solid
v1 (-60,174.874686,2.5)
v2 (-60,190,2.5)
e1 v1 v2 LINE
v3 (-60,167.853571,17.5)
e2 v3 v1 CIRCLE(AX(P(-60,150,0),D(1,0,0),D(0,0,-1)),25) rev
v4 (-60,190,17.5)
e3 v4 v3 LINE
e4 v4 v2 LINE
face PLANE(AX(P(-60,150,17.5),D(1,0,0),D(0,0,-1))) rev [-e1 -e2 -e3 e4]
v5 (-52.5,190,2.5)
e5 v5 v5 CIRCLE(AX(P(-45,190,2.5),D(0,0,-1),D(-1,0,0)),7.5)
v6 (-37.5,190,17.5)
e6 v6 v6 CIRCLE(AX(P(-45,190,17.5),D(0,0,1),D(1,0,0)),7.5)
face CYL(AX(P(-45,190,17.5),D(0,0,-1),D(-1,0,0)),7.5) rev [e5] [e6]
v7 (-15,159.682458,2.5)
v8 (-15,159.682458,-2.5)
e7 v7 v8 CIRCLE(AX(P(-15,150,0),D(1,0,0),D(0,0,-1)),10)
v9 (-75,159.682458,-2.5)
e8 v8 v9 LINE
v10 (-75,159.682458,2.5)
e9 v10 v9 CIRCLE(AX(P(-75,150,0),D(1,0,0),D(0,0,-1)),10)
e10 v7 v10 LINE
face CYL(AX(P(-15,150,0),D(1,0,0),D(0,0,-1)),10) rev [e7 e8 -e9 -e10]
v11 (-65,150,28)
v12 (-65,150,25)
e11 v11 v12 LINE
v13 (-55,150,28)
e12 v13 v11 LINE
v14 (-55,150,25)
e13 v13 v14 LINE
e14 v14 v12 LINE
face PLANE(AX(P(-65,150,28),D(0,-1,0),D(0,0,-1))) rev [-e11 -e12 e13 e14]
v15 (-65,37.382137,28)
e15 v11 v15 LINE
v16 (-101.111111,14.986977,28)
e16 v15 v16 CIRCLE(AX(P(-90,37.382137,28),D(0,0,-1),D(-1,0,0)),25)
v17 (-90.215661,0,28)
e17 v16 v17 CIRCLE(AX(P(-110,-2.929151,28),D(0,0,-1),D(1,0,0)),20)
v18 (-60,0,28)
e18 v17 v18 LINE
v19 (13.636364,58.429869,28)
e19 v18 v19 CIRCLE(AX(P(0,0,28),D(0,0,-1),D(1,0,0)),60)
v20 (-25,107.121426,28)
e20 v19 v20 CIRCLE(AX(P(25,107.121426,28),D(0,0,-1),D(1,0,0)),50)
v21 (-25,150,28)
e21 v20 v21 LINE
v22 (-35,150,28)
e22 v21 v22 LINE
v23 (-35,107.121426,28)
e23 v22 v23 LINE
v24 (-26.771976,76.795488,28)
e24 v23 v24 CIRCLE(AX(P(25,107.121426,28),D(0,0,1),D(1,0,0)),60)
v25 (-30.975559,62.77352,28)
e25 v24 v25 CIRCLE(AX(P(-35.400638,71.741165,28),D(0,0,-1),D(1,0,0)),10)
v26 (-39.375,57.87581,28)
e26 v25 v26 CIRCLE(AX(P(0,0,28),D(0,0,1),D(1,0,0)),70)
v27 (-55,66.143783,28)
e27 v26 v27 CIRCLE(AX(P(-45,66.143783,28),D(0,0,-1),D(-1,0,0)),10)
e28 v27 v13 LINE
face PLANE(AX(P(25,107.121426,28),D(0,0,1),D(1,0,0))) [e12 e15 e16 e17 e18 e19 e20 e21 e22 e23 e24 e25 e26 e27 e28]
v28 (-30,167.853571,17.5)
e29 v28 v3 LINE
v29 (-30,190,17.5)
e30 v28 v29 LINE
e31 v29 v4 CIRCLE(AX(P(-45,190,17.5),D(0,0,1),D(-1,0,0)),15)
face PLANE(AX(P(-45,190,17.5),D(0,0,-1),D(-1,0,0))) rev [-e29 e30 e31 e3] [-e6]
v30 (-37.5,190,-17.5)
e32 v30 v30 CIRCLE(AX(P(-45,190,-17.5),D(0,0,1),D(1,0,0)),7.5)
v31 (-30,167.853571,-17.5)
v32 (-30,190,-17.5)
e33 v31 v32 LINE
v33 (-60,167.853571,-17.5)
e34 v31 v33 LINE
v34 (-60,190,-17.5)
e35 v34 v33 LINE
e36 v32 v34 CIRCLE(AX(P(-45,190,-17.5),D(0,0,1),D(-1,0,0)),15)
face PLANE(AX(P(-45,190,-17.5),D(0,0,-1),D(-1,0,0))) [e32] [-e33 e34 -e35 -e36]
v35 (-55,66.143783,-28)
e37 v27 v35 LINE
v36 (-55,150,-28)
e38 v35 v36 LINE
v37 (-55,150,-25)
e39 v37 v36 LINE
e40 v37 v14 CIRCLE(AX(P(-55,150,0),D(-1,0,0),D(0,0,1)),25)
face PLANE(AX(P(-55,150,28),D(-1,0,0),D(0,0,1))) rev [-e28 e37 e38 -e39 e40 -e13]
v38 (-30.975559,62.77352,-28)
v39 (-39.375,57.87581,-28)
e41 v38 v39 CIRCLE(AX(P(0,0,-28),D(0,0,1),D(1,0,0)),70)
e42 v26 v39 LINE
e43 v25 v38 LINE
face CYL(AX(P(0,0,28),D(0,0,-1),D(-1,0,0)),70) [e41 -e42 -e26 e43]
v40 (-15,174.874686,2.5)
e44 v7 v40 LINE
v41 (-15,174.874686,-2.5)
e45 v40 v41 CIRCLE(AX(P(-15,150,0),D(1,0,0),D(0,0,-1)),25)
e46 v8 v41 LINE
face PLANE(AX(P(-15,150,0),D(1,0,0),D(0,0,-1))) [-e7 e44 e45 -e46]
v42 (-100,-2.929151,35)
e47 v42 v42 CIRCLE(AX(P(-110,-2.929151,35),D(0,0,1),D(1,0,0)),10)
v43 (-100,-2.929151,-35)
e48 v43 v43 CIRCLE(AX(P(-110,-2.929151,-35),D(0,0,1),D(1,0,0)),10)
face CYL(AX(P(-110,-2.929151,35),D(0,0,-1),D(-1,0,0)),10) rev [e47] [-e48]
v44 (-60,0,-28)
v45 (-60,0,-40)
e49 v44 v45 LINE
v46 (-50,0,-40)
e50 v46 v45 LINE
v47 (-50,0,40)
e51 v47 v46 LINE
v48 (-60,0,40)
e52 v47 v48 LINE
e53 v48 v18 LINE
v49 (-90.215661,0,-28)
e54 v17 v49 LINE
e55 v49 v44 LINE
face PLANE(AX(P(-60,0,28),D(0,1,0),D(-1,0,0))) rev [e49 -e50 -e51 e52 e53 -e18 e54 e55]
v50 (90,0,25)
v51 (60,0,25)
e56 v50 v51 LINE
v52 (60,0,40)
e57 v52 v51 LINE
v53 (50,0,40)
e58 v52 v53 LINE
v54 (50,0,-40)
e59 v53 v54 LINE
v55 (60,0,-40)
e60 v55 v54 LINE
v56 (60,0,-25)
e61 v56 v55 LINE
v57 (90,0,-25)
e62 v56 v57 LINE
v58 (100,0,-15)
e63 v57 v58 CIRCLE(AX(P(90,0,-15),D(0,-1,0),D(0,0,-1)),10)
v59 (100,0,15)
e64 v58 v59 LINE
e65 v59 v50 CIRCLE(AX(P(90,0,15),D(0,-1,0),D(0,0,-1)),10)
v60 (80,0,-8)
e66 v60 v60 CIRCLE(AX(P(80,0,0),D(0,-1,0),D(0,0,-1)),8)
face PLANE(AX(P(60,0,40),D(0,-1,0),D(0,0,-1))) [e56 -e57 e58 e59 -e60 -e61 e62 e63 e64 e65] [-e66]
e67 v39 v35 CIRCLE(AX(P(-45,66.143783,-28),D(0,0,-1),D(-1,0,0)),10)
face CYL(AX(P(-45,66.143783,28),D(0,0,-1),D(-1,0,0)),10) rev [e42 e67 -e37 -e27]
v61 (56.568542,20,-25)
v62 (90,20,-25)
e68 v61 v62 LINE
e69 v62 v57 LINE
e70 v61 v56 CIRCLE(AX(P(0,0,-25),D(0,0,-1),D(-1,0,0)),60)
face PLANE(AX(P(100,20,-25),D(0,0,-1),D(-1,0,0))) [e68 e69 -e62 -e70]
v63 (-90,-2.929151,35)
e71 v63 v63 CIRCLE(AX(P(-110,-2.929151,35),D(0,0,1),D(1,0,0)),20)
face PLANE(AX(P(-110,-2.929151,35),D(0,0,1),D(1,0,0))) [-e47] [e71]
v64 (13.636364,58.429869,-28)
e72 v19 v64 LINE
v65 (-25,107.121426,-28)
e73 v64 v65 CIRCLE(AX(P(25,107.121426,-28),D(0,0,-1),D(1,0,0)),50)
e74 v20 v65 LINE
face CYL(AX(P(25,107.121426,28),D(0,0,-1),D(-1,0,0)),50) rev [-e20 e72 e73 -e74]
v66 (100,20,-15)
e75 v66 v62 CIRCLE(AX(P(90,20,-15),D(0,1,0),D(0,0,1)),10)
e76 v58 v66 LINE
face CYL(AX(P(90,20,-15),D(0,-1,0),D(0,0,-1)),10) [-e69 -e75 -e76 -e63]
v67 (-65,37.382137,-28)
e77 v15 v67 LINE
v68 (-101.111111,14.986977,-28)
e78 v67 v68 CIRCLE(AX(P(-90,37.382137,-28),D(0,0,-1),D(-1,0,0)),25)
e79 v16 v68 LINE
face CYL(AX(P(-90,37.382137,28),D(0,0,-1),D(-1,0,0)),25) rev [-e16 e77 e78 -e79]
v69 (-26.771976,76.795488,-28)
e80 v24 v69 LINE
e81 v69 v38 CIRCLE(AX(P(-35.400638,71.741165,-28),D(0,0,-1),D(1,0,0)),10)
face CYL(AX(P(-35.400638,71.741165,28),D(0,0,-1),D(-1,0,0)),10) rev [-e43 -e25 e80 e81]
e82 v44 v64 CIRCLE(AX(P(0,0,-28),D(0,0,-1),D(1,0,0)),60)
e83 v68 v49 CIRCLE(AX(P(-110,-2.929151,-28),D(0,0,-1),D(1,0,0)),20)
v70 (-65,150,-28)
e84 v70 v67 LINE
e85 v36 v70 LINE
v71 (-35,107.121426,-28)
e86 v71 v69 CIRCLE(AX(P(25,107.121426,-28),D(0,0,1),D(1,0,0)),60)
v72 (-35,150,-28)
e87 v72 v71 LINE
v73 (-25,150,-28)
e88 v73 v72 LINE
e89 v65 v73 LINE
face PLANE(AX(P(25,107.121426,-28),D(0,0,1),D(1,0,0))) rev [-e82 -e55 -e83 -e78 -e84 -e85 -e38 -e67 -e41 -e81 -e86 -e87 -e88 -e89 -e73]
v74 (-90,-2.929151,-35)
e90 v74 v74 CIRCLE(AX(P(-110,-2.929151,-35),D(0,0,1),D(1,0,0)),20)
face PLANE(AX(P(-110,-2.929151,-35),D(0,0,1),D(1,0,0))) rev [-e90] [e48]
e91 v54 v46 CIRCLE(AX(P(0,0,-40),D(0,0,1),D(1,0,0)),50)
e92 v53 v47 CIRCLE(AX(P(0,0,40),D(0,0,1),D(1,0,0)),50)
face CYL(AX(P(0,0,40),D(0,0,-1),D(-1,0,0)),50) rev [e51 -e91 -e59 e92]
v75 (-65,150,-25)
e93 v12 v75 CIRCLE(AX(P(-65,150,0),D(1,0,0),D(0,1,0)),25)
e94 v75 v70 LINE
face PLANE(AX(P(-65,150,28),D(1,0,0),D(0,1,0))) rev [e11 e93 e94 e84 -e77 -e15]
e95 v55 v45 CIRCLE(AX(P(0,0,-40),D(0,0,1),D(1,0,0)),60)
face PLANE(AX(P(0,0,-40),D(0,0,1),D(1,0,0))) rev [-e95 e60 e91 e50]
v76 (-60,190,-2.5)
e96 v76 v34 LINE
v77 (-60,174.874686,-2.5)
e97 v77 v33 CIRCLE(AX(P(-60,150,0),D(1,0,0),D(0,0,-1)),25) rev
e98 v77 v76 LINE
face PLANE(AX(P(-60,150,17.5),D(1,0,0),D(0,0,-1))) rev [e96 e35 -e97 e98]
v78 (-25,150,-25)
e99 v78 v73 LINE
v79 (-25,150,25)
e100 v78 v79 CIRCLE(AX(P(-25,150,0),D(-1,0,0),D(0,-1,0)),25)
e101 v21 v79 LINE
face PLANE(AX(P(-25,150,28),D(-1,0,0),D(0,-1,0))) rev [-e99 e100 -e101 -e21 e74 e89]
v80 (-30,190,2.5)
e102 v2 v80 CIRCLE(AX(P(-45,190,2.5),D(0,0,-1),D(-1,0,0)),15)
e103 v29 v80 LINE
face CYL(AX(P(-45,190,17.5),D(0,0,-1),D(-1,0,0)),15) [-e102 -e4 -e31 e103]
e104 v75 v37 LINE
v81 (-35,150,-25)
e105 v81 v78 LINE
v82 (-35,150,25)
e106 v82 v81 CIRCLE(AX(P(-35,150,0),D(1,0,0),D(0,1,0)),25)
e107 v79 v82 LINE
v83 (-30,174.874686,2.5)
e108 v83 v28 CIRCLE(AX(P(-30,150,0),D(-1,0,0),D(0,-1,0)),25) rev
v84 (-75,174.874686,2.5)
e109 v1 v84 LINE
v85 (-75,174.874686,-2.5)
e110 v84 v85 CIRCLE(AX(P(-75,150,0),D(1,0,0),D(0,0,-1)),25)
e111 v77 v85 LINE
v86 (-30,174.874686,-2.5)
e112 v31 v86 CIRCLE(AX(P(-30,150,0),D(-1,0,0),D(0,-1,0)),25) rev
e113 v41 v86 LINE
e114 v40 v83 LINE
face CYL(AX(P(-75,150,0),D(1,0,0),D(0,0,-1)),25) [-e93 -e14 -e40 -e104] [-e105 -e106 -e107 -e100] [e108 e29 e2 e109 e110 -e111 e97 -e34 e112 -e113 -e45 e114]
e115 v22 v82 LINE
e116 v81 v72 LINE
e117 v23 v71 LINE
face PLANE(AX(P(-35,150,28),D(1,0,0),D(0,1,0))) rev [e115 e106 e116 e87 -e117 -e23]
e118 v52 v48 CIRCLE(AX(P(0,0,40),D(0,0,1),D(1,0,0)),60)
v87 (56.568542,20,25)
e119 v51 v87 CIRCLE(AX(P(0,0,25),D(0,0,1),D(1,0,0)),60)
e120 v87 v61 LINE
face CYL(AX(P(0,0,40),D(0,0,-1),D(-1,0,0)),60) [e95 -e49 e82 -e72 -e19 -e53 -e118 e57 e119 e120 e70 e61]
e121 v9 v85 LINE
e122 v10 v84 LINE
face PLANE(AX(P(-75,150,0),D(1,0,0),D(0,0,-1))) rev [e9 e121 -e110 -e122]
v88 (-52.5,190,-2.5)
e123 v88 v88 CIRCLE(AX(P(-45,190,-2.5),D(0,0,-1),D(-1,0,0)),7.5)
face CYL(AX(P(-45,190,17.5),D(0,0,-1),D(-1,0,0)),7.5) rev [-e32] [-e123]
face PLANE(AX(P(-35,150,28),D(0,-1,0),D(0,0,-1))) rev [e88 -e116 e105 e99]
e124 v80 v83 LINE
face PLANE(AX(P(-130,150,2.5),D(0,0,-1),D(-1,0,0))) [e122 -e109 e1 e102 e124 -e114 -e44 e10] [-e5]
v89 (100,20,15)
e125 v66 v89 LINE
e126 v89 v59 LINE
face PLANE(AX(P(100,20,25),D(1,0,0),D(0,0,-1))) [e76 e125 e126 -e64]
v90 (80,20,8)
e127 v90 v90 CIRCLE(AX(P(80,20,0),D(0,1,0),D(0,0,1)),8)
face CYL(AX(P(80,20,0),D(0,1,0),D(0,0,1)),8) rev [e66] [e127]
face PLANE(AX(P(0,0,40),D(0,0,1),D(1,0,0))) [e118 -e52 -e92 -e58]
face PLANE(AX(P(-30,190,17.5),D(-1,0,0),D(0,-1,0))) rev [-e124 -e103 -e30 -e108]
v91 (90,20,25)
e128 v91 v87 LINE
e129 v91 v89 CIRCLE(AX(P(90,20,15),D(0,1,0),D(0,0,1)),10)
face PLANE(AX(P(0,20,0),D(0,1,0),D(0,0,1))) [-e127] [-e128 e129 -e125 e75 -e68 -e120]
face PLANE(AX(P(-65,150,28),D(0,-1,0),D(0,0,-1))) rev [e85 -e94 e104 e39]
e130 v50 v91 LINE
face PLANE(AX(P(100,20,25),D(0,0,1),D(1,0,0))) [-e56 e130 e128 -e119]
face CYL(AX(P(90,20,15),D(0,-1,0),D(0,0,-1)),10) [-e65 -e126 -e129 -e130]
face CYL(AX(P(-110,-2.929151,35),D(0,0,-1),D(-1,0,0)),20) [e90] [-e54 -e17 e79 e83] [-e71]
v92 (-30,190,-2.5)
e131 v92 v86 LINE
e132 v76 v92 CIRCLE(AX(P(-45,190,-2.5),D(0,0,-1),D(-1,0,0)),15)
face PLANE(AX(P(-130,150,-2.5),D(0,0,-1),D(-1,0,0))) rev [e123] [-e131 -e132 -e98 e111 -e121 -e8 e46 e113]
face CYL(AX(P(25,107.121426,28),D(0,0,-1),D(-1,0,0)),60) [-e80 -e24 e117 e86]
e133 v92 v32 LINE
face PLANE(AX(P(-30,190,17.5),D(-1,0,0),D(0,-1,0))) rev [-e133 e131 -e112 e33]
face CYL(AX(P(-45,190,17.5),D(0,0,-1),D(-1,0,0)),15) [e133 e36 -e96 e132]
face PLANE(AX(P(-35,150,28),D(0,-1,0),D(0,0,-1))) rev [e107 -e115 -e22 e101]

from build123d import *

# Parameters (mm, degrees)
EXTRUDE_THIN1_DEPTH          = 40
SKETCH2_R                    = 20
SKETCH2_R_2                  = 10
EXTRUDE_THIN2_DEPTH          = 35
SKETCH3_W                    = 100
SKETCH3_H                    = 50
BOSS_EXTRUDE1_DEPTH          = 20
DELETEFACE4_START            = -25
DELETEFACE4_DEPTH            = 50
FILLET1_R                    = 10
SKETCH5_W                    = 8
SKETCH5_H                    = 42.929151324
SKETCH6_R                    = 25
BOSS_EXTRUDE2_DEPTH          = 60
SKETCH7_R                    = 7.5
BOSS_EXTRUDE3_DEPTH          = 17.5
BOSS_EXTRUDE4_DEPTH          = 28
F_20_0_20_DIAMETER_HOLE1_D   = 20
CUT_EXTRUDE_THIN1_DEPTH      = 239.432380351
CUT_EXTRUDE_THIN1_DEPTH_BACK = 239.432380351
SKETCH11_W                   = 5
SKETCH11_H                   = 55


# Read off the part's stored shape, not the designer's step: DeleteFace4
with BuildPart() as part:
    # Sketch1 → Extrude-Thin1 (new, symmetric)
    with BuildSketch(Plane.XY):
        with BuildLine():
            ThreePointArc((60, 0), (0, 60), (-60, 0))
            Line((-60, 0), (-50, 0))
            ThreePointArc((-50, 0), (0, 50), (50, 0))
            Line((50, 0), (60, 0))
        make_face()
    extrude(amount=EXTRUDE_THIN1_DEPTH, both=True)

    # Sketch3 → Boss-Extrude1 (add)
    with BuildSketch(Plane.XZ):
        with Locations((50, 0)):
            Rectangle(SKETCH3_W, SKETCH3_H)
    extrude(amount=-BOSS_EXTRUDE1_DEPTH)

    # DeleteFace4 outline → DeleteFace4 (cut)
    with BuildSketch(Plane.XY.offset(DELETEFACE4_START)):
        with BuildLine():
            ThreePointArc((50, 0), (48.945315647, 10.215482184), (45.82575695, 20))
            Line((45.82575695, 20), (0, 20))
            Line((0, 20), (0, 0))
            Line((0, 0), (50, 0))
        make_face()
    extrude(amount=DELETEFACE4_DEPTH, mode=Mode.SUBTRACT)

    # Fillet1
    fillet1_edges = [part.edges().sort_by_distance(p)[0] for p in [
        (100, 10, -25),
        (100, 10, 25),
    ]]
    fillet(fillet1_edges, radius=FILLET1_R)

    # Sketch5 → Ø16.0 (16) Diameter Hole1 (revolve, cut)
    with BuildSketch(Plane(origin=(80, 20, 0), x_dir=(0, 0, 1), z_dir=(1, 0, 0))):
        with Locations((4, 21.464575662)):
            Rectangle(SKETCH5_W, SKETCH5_H)
    revolve(axis=Axis((80, 26.35, 0), (0, -1, 0)), mode=Mode.SUBTRACT)



with BuildPart() as body_2:
    # Sketch2 → Extrude-Thin2 (new, symmetric)
    with BuildSketch(Plane.XY):
        with Locations((-110, -2.929151324)):
            Circle(SKETCH2_R)
        with Locations((-110, -2.929151324)):
            Circle(SKETCH2_R_2, mode=Mode.SUBTRACT)
    extrude(amount=EXTRUDE_THIN2_DEPTH, both=True)


with BuildPart() as body_3:
    # Sketch6 → Boss-Extrude2 (new body)
    with BuildSketch(Plane(origin=(-15, 0, 0), x_dir=(0, 0, -1), z_dir=(1, 0, 0))):
        with Locations((0, 150)):
            Circle(SKETCH6_R)
    extrude(amount=-BOSS_EXTRUDE2_DEPTH)

    # Sketch7 → Boss-Extrude3 (add, symmetric)
    with BuildSketch(Plane.XY):
        with BuildLine():
            Line((-60, 150), (-60, 190))
            ThreePointArc((-60, 190), (-45, 205), (-30, 190))
            Line((-30, 190), (-30, 150))
            Line((-30, 150), (-60, 150))
        make_face()
        with Locations((-45, 190)):
            Circle(SKETCH7_R, mode=Mode.SUBTRACT)
    extrude(amount=BOSS_EXTRUDE3_DEPTH, both=True)


with BuildPart() as part_1:
    add(part.part)

    add(body_2.part)  # Boss-Extrude4 merges body 2

    add(body_3.part)  # Boss-Extrude4 merges body 3
    # Sketch8 → Boss-Extrude4 (add, symmetric)
    with BuildSketch(Plane.XY):
        with BuildLine():
            Line((-25, 150), (-25, 107.121426428))
            ThreePointArc((-25, 107.121426428), (-14.16747259, 76.042348403), (13.636363636, 58.429868961))
            ThreePointArc((13.636363636, 58.429868961), (-37.29489363, 47.000967108), (-60, 0))
            Line((-60, 0), (-90.215660928, 0))
            ThreePointArc((-90.215660928, 0), (-93.823137808, 8.831338871), (-101.111111111, 14.986977006))
            ThreePointArc((-101.111111111, 14.986977006), (-76.823843083, 16.136222778), (-65, 37.382137418))
            Line((-65, 37.382137418), (-65, 150))
            Line((-65, 150), (-55, 150))
            Line((-55, 150), (-55, 66.143782777))
            ThreePointArc((-55, 66.143782777), (-49.677071733, 57.304948012), (-39.375, 57.87580993))
            ThreePointArc((-39.375, 57.87580993), (-35.260419238, 60.470677482), (-30.975558625, 62.773519639))
            ThreePointArc((-30.975558625, 62.773519639), (-25.821810248, 68.869571549), (-26.771975796, 76.79548832))
            ThreePointArc((-26.771975796, 76.79548832), (-32.906470052, 91.410260777), (-35, 107.121426428))
            Line((-35, 107.121426428), (-35, 150))
            Line((-35, 150), (-25, 150))
        make_face()
    extrude(amount=BOSS_EXTRUDE4_DEPTH, both=True)

    # Ø20.0 (20) Diameter Hole1 (through all)
    with Locations(Plane(origin=(-15, 0, 0), x_dir=(0, 0, -1), z_dir=(1, 0, 0))):
        with Locations((0, 150)):
            Hole(F_20_0_20_DIAMETER_HOLE1_D / 2)

    # Sketch11 → Cut-Extrude-Thin1 (cut, two sides: drawn at the far end of the back side and taken through both)
    with BuildSketch(Plane(origin=(-15, 0, 0), x_dir=(0, 0, -1), z_dir=(1, 0, 0)).offset(-CUT_EXTRUDE_THIN1_DEPTH_BACK)):
        with Locations((0, 177.5)):
            Rectangle(SKETCH11_W, SKETCH11_H)
    extrude(amount=CUT_EXTRUDE_THIN1_DEPTH + CUT_EXTRUDE_THIN1_DEPTH_BACK, mode=Mode.SUBTRACT)


solid = part_1.part
